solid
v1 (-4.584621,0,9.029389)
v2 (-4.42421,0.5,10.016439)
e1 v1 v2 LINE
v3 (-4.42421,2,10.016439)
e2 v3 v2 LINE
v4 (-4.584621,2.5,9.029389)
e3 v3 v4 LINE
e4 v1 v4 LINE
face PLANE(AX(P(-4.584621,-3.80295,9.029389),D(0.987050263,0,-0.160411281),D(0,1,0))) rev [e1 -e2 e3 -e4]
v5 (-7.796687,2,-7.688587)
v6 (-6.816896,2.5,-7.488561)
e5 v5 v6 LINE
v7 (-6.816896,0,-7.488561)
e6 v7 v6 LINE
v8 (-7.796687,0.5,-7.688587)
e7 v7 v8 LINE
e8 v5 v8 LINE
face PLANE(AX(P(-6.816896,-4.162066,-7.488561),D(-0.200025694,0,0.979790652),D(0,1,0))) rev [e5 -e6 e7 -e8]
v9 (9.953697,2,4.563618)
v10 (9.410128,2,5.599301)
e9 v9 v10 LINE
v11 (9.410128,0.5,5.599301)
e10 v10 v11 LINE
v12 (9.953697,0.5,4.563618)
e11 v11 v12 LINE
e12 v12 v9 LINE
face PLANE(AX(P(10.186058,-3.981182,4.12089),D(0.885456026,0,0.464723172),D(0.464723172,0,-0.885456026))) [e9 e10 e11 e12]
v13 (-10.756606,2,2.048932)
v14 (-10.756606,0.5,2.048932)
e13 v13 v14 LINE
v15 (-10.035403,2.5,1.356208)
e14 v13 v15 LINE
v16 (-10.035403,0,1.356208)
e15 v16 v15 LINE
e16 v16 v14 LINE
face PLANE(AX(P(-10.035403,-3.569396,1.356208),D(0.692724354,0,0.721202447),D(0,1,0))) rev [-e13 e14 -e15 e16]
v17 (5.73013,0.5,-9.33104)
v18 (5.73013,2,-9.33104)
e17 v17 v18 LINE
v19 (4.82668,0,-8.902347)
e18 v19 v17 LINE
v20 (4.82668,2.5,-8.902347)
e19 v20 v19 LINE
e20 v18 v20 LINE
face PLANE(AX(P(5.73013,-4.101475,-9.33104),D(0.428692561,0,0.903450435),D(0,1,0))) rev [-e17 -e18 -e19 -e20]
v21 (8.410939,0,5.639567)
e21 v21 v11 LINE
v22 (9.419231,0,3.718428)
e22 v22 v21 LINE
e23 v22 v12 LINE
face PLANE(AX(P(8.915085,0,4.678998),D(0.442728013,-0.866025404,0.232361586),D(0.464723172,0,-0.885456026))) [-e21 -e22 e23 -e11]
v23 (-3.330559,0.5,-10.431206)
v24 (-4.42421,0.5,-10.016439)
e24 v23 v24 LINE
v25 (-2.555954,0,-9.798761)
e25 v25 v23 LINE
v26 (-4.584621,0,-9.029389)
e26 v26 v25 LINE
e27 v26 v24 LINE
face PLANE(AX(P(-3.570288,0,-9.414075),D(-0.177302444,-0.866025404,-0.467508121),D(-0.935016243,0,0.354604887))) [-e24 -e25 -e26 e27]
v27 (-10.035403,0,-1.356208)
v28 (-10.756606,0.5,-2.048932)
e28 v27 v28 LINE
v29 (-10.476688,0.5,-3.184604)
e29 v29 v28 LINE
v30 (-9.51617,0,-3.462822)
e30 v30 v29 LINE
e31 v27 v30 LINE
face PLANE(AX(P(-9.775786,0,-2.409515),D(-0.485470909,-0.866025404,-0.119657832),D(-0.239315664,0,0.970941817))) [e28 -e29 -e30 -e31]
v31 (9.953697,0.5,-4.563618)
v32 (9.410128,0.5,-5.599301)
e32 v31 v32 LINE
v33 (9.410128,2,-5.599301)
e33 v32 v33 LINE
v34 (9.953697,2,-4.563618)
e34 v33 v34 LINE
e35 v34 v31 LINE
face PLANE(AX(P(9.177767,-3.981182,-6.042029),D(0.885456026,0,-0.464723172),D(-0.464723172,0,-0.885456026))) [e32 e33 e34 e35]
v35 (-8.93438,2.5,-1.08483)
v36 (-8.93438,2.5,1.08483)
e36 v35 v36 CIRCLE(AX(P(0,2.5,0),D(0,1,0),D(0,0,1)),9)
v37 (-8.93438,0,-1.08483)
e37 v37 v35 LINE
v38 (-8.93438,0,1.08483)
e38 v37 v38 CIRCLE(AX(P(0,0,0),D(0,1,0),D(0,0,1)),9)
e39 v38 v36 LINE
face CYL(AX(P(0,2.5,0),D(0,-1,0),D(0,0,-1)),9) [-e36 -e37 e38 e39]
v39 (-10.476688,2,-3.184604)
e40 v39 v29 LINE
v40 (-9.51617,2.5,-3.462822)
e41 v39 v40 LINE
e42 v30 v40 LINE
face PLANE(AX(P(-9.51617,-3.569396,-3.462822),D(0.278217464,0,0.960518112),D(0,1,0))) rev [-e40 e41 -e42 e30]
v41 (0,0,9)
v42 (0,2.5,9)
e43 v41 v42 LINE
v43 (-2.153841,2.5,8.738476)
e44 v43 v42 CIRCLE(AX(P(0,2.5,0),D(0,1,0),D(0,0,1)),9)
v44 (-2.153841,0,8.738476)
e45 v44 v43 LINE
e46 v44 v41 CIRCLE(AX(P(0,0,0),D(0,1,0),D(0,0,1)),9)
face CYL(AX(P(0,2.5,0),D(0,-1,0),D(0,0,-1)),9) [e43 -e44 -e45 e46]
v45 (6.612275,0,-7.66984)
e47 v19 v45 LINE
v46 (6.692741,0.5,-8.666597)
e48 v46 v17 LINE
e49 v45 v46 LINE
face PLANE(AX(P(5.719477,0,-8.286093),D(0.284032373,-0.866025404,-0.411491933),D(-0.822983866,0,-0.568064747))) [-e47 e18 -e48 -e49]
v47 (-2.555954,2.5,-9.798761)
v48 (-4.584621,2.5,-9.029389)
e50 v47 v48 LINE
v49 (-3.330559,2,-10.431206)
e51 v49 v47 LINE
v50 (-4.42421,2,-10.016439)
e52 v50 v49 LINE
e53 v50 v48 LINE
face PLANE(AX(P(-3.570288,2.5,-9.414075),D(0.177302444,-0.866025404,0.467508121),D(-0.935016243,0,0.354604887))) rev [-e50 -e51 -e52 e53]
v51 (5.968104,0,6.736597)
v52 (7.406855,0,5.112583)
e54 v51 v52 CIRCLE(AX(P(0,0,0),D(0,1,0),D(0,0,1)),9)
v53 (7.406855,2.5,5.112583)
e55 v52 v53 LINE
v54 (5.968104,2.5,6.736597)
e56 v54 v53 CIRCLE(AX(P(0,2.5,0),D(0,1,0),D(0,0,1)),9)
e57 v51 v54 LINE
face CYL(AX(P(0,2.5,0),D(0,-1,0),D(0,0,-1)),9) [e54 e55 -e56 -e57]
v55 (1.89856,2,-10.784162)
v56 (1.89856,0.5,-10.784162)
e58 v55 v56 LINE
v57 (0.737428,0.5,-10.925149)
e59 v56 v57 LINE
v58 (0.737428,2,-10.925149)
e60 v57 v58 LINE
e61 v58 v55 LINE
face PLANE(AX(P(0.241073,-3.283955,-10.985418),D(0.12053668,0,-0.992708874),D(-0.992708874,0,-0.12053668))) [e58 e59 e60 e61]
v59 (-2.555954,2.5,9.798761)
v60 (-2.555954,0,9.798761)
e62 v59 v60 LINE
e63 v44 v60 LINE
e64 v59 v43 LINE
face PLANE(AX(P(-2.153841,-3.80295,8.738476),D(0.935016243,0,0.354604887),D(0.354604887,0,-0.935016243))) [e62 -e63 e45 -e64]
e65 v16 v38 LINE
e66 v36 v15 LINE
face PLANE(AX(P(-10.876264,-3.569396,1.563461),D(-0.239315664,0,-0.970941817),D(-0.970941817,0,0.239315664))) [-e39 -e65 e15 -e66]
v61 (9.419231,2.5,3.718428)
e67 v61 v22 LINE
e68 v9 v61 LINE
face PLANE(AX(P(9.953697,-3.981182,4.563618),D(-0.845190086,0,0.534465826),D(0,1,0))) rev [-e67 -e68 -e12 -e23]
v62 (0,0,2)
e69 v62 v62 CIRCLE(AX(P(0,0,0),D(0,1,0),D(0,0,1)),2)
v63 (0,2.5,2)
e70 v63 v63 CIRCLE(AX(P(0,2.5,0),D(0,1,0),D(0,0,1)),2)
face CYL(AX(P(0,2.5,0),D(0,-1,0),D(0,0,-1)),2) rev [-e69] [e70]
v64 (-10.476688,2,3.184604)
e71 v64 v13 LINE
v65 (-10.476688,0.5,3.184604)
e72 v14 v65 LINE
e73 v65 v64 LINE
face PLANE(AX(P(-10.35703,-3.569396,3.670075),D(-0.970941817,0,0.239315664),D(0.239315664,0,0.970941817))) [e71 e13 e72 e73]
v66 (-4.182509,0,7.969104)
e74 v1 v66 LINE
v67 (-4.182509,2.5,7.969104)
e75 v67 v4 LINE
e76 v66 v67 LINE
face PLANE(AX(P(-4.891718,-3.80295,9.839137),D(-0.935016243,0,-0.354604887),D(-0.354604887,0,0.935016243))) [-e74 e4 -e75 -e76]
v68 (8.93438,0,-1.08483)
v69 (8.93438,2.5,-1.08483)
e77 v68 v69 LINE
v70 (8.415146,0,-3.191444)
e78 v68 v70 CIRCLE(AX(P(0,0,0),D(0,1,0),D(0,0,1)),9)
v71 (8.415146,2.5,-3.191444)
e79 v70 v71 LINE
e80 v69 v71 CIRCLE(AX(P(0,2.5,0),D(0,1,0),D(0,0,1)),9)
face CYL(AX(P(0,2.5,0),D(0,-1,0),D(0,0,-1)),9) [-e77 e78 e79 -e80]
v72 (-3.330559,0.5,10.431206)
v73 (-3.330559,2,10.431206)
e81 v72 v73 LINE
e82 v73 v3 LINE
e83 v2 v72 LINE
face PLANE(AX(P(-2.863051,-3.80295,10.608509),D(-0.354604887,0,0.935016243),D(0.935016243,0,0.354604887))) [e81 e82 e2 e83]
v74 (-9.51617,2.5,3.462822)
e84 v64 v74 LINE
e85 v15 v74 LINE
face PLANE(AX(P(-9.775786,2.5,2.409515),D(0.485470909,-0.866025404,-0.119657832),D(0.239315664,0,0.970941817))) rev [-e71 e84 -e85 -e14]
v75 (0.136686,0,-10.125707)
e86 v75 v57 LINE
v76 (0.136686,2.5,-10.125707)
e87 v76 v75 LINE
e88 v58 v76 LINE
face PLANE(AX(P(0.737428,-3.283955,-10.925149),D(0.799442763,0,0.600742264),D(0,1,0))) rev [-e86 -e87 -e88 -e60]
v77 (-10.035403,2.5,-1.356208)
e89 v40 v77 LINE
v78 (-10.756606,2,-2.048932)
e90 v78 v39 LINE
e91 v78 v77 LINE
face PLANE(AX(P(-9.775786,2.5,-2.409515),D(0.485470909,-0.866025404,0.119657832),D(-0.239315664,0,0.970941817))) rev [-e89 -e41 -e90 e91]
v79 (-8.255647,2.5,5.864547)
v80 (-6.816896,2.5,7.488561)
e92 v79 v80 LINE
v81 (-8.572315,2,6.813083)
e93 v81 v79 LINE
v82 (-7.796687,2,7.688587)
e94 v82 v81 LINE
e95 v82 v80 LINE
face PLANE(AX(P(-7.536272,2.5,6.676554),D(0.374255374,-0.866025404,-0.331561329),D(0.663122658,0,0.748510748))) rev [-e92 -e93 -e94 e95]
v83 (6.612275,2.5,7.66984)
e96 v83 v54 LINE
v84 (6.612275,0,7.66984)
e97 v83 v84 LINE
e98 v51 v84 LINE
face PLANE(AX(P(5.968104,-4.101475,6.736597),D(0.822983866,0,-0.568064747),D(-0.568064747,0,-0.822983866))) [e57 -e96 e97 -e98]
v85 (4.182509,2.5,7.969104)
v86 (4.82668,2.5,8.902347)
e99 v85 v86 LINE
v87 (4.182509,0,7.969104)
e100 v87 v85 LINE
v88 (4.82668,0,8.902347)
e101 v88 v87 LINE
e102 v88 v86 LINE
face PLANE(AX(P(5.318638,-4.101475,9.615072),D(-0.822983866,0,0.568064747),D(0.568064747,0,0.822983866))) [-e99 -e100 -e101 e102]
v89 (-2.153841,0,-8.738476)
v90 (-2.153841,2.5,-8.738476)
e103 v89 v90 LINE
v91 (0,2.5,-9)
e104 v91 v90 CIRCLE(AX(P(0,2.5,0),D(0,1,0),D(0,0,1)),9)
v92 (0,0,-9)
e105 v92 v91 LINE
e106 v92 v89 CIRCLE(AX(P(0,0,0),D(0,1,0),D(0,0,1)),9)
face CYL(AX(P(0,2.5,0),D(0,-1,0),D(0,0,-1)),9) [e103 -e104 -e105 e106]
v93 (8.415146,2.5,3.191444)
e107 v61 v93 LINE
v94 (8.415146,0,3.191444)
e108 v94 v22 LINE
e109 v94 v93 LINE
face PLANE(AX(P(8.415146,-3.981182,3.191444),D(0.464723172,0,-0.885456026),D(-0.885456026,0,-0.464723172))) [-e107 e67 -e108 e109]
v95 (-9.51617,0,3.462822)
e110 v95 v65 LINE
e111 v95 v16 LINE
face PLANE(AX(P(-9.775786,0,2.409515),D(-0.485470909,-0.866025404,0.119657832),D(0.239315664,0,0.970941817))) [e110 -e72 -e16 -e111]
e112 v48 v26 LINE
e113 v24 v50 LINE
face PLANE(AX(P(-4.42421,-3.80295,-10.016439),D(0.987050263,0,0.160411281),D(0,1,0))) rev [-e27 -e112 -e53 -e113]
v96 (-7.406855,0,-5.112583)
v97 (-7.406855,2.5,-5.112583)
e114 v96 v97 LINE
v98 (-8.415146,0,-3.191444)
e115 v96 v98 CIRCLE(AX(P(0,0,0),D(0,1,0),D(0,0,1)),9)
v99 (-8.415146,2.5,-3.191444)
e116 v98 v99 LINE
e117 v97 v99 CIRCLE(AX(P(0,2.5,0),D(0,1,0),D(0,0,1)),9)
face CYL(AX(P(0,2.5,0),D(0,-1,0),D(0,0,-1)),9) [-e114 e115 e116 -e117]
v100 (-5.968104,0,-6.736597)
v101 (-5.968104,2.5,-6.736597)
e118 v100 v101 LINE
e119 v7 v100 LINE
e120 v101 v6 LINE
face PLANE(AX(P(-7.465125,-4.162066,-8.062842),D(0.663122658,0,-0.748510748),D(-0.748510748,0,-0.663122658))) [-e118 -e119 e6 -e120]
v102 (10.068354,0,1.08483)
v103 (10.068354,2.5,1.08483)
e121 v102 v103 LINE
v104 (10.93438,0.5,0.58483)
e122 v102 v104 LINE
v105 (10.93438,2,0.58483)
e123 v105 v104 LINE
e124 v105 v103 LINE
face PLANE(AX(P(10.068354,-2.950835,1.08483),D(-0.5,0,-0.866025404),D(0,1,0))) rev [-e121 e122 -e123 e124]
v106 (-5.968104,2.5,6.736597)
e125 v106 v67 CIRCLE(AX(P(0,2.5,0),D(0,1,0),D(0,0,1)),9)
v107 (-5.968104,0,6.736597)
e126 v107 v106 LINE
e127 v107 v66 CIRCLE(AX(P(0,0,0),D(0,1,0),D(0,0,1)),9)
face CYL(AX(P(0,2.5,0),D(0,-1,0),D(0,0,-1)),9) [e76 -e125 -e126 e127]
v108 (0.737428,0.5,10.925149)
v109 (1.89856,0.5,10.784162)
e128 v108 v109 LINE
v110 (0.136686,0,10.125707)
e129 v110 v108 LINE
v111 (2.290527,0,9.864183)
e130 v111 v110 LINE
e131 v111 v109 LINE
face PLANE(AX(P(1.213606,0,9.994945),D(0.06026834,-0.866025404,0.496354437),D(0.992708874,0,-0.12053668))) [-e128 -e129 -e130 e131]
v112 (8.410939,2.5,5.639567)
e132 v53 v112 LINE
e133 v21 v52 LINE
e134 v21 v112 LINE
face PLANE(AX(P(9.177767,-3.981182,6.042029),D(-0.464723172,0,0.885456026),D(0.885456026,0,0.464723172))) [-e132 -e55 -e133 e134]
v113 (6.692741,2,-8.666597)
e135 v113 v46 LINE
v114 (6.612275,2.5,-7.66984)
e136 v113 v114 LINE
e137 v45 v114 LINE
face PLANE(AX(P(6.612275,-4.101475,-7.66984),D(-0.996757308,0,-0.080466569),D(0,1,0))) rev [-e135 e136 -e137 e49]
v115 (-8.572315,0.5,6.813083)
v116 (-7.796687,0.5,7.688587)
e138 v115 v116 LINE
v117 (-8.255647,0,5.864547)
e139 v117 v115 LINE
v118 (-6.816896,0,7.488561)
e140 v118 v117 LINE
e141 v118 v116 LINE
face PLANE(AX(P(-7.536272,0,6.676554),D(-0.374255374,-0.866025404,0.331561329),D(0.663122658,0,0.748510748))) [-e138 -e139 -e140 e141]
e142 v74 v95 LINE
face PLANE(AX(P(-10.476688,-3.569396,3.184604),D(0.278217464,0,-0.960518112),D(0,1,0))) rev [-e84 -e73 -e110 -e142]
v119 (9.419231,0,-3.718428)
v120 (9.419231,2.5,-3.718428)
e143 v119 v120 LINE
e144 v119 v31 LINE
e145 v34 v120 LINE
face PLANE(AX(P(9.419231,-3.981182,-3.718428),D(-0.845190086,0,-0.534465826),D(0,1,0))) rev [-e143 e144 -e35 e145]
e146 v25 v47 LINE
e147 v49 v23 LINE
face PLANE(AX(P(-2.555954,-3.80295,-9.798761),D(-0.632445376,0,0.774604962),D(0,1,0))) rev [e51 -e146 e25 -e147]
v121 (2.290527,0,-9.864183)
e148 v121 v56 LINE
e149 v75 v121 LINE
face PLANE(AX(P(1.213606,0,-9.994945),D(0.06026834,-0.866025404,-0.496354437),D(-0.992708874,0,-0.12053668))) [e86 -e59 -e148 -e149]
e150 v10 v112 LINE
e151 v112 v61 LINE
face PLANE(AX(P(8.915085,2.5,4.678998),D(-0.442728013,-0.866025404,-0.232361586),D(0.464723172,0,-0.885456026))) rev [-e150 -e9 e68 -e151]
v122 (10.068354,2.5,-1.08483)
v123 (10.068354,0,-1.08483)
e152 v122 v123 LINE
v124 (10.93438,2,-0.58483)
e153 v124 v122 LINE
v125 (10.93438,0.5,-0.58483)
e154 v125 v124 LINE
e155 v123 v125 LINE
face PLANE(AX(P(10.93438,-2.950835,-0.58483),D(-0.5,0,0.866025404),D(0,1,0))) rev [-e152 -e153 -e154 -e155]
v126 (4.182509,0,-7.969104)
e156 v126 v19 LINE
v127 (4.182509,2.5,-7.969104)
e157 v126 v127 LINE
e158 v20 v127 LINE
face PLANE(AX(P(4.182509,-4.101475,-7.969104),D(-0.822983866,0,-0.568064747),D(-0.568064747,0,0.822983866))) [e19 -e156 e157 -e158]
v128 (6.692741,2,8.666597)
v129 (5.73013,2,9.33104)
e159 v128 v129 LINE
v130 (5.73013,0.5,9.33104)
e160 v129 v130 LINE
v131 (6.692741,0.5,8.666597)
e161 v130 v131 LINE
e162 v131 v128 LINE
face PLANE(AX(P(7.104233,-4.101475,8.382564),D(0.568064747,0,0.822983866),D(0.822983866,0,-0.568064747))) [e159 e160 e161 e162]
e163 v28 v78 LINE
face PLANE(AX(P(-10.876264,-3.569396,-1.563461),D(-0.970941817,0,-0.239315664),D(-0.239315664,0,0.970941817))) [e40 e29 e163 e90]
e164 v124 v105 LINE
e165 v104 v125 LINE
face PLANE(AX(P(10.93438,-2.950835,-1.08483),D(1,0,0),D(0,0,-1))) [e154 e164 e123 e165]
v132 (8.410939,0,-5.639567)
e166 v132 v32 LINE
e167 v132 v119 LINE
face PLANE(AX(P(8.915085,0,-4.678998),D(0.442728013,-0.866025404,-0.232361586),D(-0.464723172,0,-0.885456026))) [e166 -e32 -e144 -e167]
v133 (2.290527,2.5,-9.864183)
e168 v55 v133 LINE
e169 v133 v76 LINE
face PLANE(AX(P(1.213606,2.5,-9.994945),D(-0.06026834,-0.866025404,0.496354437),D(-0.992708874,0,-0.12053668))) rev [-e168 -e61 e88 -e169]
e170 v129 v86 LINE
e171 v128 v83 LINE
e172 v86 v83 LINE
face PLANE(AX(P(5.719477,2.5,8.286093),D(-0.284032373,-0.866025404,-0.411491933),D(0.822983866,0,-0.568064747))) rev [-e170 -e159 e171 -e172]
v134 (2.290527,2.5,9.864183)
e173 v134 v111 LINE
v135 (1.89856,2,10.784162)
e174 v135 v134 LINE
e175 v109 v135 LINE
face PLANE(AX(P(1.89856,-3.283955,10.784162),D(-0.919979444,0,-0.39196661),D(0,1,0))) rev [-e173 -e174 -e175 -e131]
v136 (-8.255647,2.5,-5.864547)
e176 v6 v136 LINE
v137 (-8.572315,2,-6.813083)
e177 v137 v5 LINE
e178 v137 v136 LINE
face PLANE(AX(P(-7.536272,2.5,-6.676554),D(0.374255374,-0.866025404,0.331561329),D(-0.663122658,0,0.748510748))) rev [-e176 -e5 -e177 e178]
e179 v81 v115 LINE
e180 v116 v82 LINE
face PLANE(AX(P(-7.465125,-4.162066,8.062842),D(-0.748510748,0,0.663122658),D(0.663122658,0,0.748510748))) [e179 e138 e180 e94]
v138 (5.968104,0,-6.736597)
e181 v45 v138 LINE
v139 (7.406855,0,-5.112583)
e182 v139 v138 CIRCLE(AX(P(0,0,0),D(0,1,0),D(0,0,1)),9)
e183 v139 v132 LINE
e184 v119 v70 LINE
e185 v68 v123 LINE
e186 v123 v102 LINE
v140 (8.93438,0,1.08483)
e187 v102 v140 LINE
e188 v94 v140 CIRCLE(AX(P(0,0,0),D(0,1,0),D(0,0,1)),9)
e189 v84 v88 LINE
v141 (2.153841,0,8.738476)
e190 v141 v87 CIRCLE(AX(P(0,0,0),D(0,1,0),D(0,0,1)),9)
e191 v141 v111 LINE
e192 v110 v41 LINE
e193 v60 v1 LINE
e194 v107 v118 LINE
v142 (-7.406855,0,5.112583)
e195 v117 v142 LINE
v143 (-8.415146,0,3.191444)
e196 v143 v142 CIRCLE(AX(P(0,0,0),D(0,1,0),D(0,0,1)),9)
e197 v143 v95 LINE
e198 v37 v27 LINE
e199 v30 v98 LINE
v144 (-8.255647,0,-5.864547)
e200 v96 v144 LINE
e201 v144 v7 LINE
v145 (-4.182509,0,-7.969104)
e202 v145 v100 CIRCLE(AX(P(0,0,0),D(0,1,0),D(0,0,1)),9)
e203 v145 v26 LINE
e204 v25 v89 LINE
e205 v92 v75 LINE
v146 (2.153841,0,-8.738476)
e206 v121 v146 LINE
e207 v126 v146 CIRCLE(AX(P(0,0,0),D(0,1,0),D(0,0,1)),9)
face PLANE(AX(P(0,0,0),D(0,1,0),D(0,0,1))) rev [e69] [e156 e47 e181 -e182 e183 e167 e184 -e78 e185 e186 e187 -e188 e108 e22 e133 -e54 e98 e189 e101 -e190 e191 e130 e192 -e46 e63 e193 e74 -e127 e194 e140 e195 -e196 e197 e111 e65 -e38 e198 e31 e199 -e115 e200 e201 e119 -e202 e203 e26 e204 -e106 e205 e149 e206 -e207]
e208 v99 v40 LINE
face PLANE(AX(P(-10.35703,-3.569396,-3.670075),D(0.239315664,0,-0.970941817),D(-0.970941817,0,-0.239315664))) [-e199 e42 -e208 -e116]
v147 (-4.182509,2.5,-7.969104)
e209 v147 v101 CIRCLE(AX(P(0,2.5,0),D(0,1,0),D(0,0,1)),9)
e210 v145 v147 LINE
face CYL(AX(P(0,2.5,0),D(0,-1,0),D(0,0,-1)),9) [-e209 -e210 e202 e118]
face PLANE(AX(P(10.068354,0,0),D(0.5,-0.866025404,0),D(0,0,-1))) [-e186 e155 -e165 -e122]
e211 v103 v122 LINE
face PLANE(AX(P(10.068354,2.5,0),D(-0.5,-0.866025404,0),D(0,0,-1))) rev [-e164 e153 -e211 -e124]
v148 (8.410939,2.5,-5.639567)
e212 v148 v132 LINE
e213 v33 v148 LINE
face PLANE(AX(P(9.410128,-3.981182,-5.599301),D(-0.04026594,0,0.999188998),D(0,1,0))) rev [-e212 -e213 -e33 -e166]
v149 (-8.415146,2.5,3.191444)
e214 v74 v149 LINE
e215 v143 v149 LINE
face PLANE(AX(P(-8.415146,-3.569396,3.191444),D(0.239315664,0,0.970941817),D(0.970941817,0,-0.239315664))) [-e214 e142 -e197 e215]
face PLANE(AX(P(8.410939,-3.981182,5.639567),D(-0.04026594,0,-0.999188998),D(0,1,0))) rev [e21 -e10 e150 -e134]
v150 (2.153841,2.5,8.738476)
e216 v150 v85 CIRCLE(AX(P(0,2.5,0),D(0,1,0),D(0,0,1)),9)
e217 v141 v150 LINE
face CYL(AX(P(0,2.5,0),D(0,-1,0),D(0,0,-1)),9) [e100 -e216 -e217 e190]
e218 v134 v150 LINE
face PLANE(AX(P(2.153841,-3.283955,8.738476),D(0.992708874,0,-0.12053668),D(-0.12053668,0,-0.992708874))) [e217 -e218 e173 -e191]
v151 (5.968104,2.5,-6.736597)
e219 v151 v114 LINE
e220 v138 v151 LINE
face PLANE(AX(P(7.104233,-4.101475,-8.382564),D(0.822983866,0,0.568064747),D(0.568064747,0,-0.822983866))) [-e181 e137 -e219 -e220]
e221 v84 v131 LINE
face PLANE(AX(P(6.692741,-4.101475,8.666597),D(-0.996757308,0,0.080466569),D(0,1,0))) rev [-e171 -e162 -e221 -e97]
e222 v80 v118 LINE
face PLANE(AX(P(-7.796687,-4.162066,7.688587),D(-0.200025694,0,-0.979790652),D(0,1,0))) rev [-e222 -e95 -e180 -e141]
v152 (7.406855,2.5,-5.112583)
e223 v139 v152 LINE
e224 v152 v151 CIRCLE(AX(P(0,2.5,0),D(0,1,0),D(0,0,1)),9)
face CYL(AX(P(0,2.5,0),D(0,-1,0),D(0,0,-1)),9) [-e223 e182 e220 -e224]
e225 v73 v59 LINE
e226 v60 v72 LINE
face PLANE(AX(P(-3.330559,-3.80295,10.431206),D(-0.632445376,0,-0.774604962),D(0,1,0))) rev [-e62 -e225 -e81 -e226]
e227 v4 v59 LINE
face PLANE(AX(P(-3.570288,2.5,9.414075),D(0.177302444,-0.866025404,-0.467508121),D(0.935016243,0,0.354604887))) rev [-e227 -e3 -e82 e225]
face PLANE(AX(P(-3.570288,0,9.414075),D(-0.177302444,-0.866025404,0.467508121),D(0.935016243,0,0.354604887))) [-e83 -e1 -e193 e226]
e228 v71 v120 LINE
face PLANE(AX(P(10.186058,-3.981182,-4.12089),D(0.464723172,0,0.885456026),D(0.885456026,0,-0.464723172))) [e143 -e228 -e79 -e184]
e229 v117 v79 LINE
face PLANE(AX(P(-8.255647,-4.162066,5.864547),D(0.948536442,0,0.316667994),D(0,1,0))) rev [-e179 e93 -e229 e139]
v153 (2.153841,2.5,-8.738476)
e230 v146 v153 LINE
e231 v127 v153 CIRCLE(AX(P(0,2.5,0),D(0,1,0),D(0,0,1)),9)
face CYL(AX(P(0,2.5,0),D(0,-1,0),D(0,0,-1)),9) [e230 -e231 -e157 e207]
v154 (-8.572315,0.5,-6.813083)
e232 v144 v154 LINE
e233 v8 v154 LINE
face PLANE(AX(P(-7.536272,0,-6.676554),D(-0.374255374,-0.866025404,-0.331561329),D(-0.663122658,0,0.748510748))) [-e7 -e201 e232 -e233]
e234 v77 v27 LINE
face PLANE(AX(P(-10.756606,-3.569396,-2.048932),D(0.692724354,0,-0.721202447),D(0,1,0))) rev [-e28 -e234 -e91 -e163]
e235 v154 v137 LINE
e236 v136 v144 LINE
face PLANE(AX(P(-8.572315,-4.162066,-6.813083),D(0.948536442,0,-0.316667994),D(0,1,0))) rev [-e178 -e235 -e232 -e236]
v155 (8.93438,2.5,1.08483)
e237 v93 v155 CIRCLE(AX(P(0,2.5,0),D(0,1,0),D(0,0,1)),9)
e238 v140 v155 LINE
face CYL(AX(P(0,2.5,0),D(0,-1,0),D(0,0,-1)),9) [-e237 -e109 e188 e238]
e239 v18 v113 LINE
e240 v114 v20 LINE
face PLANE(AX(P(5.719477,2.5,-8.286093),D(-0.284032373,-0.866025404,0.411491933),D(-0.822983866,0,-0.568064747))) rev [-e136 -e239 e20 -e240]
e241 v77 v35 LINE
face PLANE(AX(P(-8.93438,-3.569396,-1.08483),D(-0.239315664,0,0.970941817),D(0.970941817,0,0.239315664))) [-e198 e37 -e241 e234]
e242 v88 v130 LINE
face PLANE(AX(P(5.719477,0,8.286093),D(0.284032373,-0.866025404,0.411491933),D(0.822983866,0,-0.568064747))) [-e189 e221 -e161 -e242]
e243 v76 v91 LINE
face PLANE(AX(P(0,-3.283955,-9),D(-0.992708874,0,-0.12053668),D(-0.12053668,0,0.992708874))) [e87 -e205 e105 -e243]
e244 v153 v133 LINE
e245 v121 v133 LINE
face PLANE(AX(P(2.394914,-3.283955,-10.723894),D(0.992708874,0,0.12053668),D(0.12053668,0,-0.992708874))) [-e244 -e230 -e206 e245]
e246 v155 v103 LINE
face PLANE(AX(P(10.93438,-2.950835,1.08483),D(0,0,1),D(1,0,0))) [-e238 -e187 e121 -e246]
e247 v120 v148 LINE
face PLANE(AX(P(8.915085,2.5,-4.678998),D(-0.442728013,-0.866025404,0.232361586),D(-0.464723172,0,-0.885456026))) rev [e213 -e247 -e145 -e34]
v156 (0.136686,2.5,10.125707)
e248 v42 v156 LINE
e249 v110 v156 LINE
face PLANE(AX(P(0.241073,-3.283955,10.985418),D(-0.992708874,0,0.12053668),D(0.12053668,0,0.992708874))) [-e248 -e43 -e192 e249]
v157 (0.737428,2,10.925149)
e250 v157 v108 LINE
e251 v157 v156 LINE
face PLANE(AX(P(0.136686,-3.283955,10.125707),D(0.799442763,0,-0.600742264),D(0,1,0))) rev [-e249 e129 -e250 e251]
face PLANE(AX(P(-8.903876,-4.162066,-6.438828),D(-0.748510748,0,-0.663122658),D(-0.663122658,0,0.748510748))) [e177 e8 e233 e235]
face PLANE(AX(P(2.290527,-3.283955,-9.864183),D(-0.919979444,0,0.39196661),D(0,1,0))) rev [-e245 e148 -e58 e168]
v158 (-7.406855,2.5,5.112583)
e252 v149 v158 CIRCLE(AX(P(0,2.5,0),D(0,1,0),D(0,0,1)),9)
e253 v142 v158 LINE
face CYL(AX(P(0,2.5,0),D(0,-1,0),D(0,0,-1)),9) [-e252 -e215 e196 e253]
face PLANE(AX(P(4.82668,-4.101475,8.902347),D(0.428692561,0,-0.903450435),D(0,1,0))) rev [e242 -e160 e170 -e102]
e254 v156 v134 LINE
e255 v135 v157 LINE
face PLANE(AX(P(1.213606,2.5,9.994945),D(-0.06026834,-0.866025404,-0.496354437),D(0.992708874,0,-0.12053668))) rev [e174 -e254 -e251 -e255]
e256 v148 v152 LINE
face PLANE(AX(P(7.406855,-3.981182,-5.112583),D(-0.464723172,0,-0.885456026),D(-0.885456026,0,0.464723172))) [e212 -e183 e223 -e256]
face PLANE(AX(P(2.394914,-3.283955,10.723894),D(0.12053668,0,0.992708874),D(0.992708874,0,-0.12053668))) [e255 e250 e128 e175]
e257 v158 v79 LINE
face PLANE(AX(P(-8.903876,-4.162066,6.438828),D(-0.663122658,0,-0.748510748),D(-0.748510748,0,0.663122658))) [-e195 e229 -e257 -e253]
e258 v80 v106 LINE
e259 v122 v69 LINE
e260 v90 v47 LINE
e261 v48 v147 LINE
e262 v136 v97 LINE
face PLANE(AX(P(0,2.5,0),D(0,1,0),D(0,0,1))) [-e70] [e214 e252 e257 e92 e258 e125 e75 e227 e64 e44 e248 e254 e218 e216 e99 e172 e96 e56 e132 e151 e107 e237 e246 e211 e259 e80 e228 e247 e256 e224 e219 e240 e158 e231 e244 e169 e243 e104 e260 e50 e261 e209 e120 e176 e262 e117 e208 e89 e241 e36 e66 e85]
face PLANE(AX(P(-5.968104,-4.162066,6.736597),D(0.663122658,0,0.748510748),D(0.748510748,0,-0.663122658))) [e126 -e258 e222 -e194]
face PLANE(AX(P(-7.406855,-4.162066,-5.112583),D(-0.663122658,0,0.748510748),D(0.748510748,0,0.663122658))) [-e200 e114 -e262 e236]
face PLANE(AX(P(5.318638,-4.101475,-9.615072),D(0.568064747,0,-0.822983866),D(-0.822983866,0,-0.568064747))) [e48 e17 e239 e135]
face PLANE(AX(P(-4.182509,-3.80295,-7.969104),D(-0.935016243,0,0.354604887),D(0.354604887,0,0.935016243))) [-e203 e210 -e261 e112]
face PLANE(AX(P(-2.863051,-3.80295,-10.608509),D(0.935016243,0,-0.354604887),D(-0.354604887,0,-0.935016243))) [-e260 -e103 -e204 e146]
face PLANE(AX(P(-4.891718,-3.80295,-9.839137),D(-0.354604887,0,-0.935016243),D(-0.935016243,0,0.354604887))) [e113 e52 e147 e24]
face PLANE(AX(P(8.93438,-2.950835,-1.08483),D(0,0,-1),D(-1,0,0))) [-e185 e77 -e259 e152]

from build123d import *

# Parameters (mm, degrees)
SKETCH1_R                = 9
SKETCH1_R_2              = 2
BOSS_EXTRUDE1_DEPTH      = 2.5
BOSS_EXTRUDE2_START      = -2.5
BOSS_EXTRUDE2_DEPTH      = 2.5
CHAMFER1_SIZE            = 0.5
CHAMFER1_SIZE2           = 0.866025404
CIRPATTERN1_DEPTH        = 2.5
CIRPATTERN1_START        = -6
CIRPATTERN1_2_OUTLINE_W  = 5
CIRPATTERN1_2_OUTLINE_H  = 6
CIRPATTERN1_2_DEPTH      = 0.965822768
CIRPATTERN1_START_2      = -7.632253443
CIRPATTERN1_3_OUTLINE_W  = 5
CIRPATTERN1_3_OUTLINE_H  = 6
CIRPATTERN1_3_DEPTH      = 0.433012702
CIRPATTERN1_4_OUTLINE_W  = 5
CIRPATTERN1_4_OUTLINE_H  = 5
CIRPATTERN1_4_DEPTH      = 0.965822768
CIRPATTERN1_START_3      = -9
CIRPATTERN1_5_OUTLINE_W  = 5
CIRPATTERN1_5_OUTLINE_H  = 6
CIRPATTERN1_5_DEPTH      = 1.800759259
CIRPATTERN1_START_4      = -5.467189934
CIRPATTERN1_6_OUTLINE_W  = 5
CIRPATTERN1_6_OUTLINE_H  = 5
CIRPATTERN1_6_DEPTH      = 0.433012702
CIRPATTERN1_7_OUTLINE_W  = 6
CIRPATTERN1_7_OUTLINE_H  = 5
CIRPATTERN1_7_DEPTH      = 1.800759259
CIRPATTERN1_8_OUTLINE_W  = 5
CIRPATTERN1_8_OUTLINE_H  = 5
CIRPATTERN1_8_DEPTH      = 0.965822768
CIRPATTERN1_9_OUTLINE_W  = 6
CIRPATTERN1_9_OUTLINE_H  = 5
CIRPATTERN1_9_DEPTH      = 1.800759259
CIRPATTERN1_10_OUTLINE_W = 5
CIRPATTERN1_10_OUTLINE_H = 5
CIRPATTERN1_10_DEPTH     = 0.965822768
CIRPATTERN1_11_OUTLINE_W = 5
CIRPATTERN1_11_OUTLINE_H = 6
CIRPATTERN1_11_DEPTH     = 1.800759259
CIRPATTERN1_12_OUTLINE_W = 5
CIRPATTERN1_12_OUTLINE_H = 6
CIRPATTERN1_12_DEPTH     = 0.965822768
CIRPATTERN1_13_OUTLINE_W = 5
CIRPATTERN1_13_OUTLINE_H = 6
CIRPATTERN1_13_DEPTH     = 1.800759259
CIRPATTERN1_START_5      = 5.034177232
CIRPATTERN1_14_OUTLINE_W = 5
CIRPATTERN1_14_OUTLINE_H = 5
CIRPATTERN1_14_DEPTH     = 0.965822768
CIRPATTERN1_START_6      = 7.199240741
CIRPATTERN1_15_OUTLINE_W = 5
CIRPATTERN1_15_OUTLINE_H = 5
CIRPATTERN1_15_DEPTH     = 0.433012702
CIRPATTERN1_16_OUTLINE_W = 5
CIRPATTERN1_16_OUTLINE_H = 6
CIRPATTERN1_16_DEPTH     = 0.965822768
CIRPATTERN1_17_OUTLINE_W = 6
CIRPATTERN1_17_OUTLINE_H = 6
CIRPATTERN1_17_DEPTH     = 1.800759259
CIRPATTERN1_18_OUTLINE_W = 6
CIRPATTERN1_18_OUTLINE_H = 6
CIRPATTERN1_18_DEPTH     = 0.965822768
CIRPATTERN1_19_OUTLINE_W = 6
CIRPATTERN1_19_OUTLINE_H = 6
CIRPATTERN1_19_DEPTH     = 1.800759259
CIRPATTERN1_20_OUTLINE_W = 5
CIRPATTERN1_20_OUTLINE_H = 6
CIRPATTERN1_20_DEPTH     = 0.965822768
CIRPATTERN1_21_OUTLINE_W = 5
CIRPATTERN1_21_OUTLINE_H = 6
CIRPATTERN1_21_DEPTH     = 0.433012702
CIRPATTERN1_22_OUTLINE_W = 6
CIRPATTERN1_22_OUTLINE_H = 6
CIRPATTERN1_22_DEPTH     = 0.965822768
CIRPATTERN1_23_OUTLINE_W = 6
CIRPATTERN1_23_OUTLINE_H = 6
CIRPATTERN1_23_DEPTH     = 1.800759259
CIRPATTERN1_24_OUTLINE_W = 5
CIRPATTERN1_24_OUTLINE_H = 6
CIRPATTERN1_24_DEPTH     = 0.965822768
CIRPATTERN1_25_OUTLINE_W = 6
CIRPATTERN1_25_OUTLINE_H = 6
CIRPATTERN1_25_DEPTH     = 1.800759259


with BuildPart() as part:
    # Sketch1 → Boss-Extrude1 (new body)
    with BuildSketch(Plane(origin=(0, 0, 0), x_dir=(1, 0, 0), z_dir=(0, 1, 0))):
        with Locations(Location((0, 0, 0), (0, 0, 270))):
            Circle(SKETCH1_R)
        with Locations(Location((0, 0, 0), (0, 0, 270))):
            Circle(SKETCH1_R_2, mode=Mode.SUBTRACT)
    extrude(amount=BOSS_EXTRUDE1_DEPTH)

    # Sketch2 → Boss-Extrude2 (add)
    with BuildSketch(Plane(origin=(0, 2.5, 0), x_dir=(1, 0, 0), z_dir=(0, 1, 0)).offset(BOSS_EXTRUDE2_START)):
        with BuildLine():
            Line((0, 9), (0.241073361, 10.985417748))
            Line((0.241073361, 10.985417748), (2.394914339, 10.723894105))
            Line((2.394914339, 10.723894105), (2.153840979, 8.738476357))
            ThreePointArc((2.153840979, 8.738476357), (1.084830122, 8.934379867), (0, 9))
        make_face()
    extrude(amount=BOSS_EXTRUDE2_DEPTH)

    # Chamfer1
    chamfer1_edges = [part.edges().sort_by_distance(p)[0] for p in [
        (0.241073361, 1.25, -10.985417748),
        (2.394914339, 1.25, -10.723894105),
        (1.31799385, 2.5, -10.854655927),
        (1.31799385, 0, -10.854655927),
    ]]
    chamfer1_side = [part.faces().sort_by_distance(p)[0] for p in [
        (1.31799385, 1.25, -10.854655927),
    ]]
    chamfer(chamfer1_edges, length=CHAMFER1_SIZE, length2=CHAMFER1_SIZE2, reference=chamfer1_side[0])

    # CirPattern1: read off the stored shape, not the designer's step
    # CirPattern1 outline → CirPattern1 (add)
    with BuildSketch(Plane(origin=(0, 0, 0), x_dir=(1, 0, 0), z_dir=(0, 1, 0))):
        with BuildLine():
            Line((-4.424210201, 10.01643916), (-4.584621482, 9.029388897))
            Line((-4.584621482, 9.029388897), (-4.182508548, 7.969104231))
            ThreePointArc((-4.182508548, 7.969104231), (-3.191443983, 8.415146184), (-2.153840979, 8.738476357))
            Line((-2.153840979, 8.738476357), (-2.555953912, 9.798761023))
            Line((-2.555953912, 9.798761023), (-3.330558874, 10.431206399))
            Line((-3.330558874, 10.431206399), (-4.424210201, 10.01643916))
        make_face()
        with BuildLine():
            ThreePointArc((4.182508548, 7.969104232), (5.112582721, 7.406854794), (5.968103924, 6.736596734))
            Line((5.968103924, 6.736596734), (6.612274916, 7.669839531))
            Line((6.612274916, 7.669839531), (6.692741485, 8.666596839))
            Line((6.692741485, 8.666596839), (5.730129975, 9.331039589))
            Line((5.730129975, 9.331039589), (4.82667954, 8.902347028))
            Line((4.82667954, 8.902347028), (4.182508548, 7.969104232))
        make_face()
        with BuildLine():
            ThreePointArc((7.406854794, 5.112582721), (7.969104232, 4.182508549), (8.415146185, 3.191443983))
            Line((8.415146185, 3.191443983), (9.419230823, 3.718428255))
            Line((9.419230823, 3.718428255), (9.953696649, 4.56361834))
            Line((9.953696649, 4.56361834), (9.41012843, 5.599301052))
            Line((9.41012843, 5.599301052), (8.410939432, 5.639566992))
            Line((8.410939432, 5.639566992), (7.406854794, 5.112582721))
        make_face()
        with BuildLine():
            ThreePointArc((8.934379868, 1.084830122), (9.000000001, 0), (8.934379868, -1.084830122))
            Line((8.934379868, -1.084830122), (10.068354463, -1.084830122))
            Line((10.068354463, -1.084830122), (10.934379867, -0.584830122))
            Line((10.934379867, -0.584830122), (10.934379867, 0.584830122))
            Line((10.934379867, 0.584830122), (10.068354463, 1.084830122))
            Line((10.068354463, 1.084830122), (8.934379868, 1.084830122))
        make_face()
        with BuildLine():
            ThreePointArc((8.415146185, -3.191443984), (7.969104232, -4.182508549), (7.406854794, -5.112582721))
            Line((7.406854794, -5.112582721), (8.410939432, -5.639566992))
            Line((8.410939432, -5.639566992), (9.41012843, -5.599301052))
            Line((9.41012843, -5.599301052), (9.953696649, -4.56361834))
            Line((9.953696649, -4.56361834), (9.419230823, -3.718428255))
            Line((9.419230823, -3.718428255), (8.415146185, -3.191443984))
        make_face()
        with BuildLine():
            ThreePointArc((5.968103924, -6.736596734), (5.112582721, -7.406854794), (4.182508548, -7.969104232))
            Line((4.182508548, -7.969104232), (4.82667954, -8.902347028))
            Line((4.82667954, -8.902347028), (5.730129975, -9.331039589))
            Line((5.730129975, -9.331039589), (6.692741485, -8.666596839))
            Line((6.692741485, -8.666596839), (6.612274916, -7.669839531))
            Line((6.612274916, -7.669839531), (5.968103924, -6.736596734))
        make_face()
        with BuildLine():
            ThreePointArc((2.153840979, -8.738476357), (1.084830123, -8.934379867), (0, -9))
            Line((0, -9), (0.136685533, -10.125706645))
            Line((0.136685533, -10.125706645), (0.737427798, -10.925149408))
            Line((0.737427798, -10.925149408), (1.898559902, -10.784162445))
            Line((1.898559902, -10.784162445), (2.290526512, -9.864183001))
            Line((2.290526512, -9.864183001), (2.153840979, -8.738476357))
        make_face()
        with BuildLine():
            ThreePointArc((-2.153840979, -8.738476357), (-3.191443983, -8.415146184), (-4.182508548, -7.969104231))
            Line((-4.182508548, -7.969104231), (-4.584621482, -9.029388897))
            Line((-4.584621482, -9.029388897), (-4.424210201, -10.01643916))
            Line((-4.424210201, -10.01643916), (-3.330558874, -10.431206399))
            Line((-3.330558874, -10.431206399), (-2.555953912, -9.798761023))
            Line((-2.555953912, -9.798761023), (-2.153840979, -8.738476357))
        make_face()
        with BuildLine():
            ThreePointArc((-5.968103923, -6.736596733), (-6.736596733, -5.968103924), (-7.406854792, -5.11258272))
            Line((-7.406854792, -5.11258272), (-8.255646966, -5.864546969))
            Line((-8.255646966, -5.864546969), (-8.57231496, -6.813083411))
            Line((-8.57231496, -6.813083411), (-7.79668675, -7.688586676))
            Line((-7.79668675, -7.688586676), (-6.816896098, -7.488560982))
            Line((-6.816896098, -7.488560982), (-5.968103923, -6.736596733))
        make_face()
        with BuildLine():
            ThreePointArc((-8.415146183, -3.191443983), (-8.738476356, -2.153840978), (-8.934379866, -1.084830122))
            Line((-8.934379866, -1.084830122), (-10.035403222, -1.356208006))
            Line((-10.035403222, -1.356208006), (-10.75660567, -2.04893236))
            Line((-10.75660567, -2.04893236), (-10.476687651, -3.184604403))
            Line((-10.476687651, -3.184604403), (-9.51616954, -3.462821867))
            Line((-9.51616954, -3.462821867), (-8.415146183, -3.191443983))
        make_face()
        with BuildLine():
            ThreePointArc((-8.934379866, 1.084830122), (-8.738476356, 2.153840978), (-8.415146183, 3.191443983))
            Line((-8.415146183, 3.191443983), (-9.51616954, 3.462821867))
            Line((-9.51616954, 3.462821867), (-10.476687651, 3.184604403))
            Line((-10.476687651, 3.184604403), (-10.75660567, 2.04893236))
            Line((-10.75660567, 2.04893236), (-10.035403222, 1.356208006))
            Line((-10.035403222, 1.356208006), (-8.934379866, 1.084830122))
        make_face()
        with BuildLine():
            ThreePointArc((-7.406854792, 5.11258272), (-6.736596733, 5.968103924), (-5.968103923, 6.736596733))
            Line((-5.968103923, 6.736596733), (-6.816896098, 7.488560982))
            Line((-6.816896098, 7.488560982), (-7.79668675, 7.688586676))
            Line((-7.79668675, 7.688586676), (-8.57231496, 6.813083411))
            Line((-8.57231496, 6.813083411), (-8.255646966, 5.864546969))
            Line((-8.255646966, 5.864546969), (-7.406854792, 5.11258272))
        make_face()
    extrude(amount=CIRPATTERN1_DEPTH)

    # CirPattern1 2 outline → CirPattern1 2 (cut)
    with BuildSketch(Plane(origin=(0, 0, 0), x_dir=(0.984156412122274, -0.15602034224555472, -0.08422475458078069), z_dir=(0.17730244352126895, 0.8660254037844377, 0.4675081213427088)).offset(CIRPATTERN1_START)):
        with Locations((-2.5, 9)):
            Rectangle(CIRPATTERN1_2_OUTLINE_W, CIRPATTERN1_2_OUTLINE_H)
    extrude(amount=CIRPATTERN1_2_DEPTH, mode=Mode.SUBTRACT)

    # CirPattern1 3 outline → CirPattern1 3 (cut)
    with BuildSketch(Plane(origin=(0, 0, 0), x_dir=(0.984156412122274, 0.15602034224555472, -0.08422475458078069), z_dir=(0.17730244352126895, -0.8660254037844377, 0.4675081213427088)).offset(CIRPATTERN1_START_2)):
        with Locations((-2.5, -8)):
            Rectangle(CIRPATTERN1_3_OUTLINE_W, CIRPATTERN1_3_OUTLINE_H)
    extrude(amount=CIRPATTERN1_3_DEPTH, mode=Mode.SUBTRACT)

    # CirPattern1 4 outline → CirPattern1 4 (cut)
    with BuildSketch(Plane(origin=(0, 0, 0), x_dir=(0.9273256790190187, -0.3495154602035865, -0.13381340781323425), z_dir=(0.37425537408555104, 0.8660254037844392, 0.33156132912039604)).offset(CIRPATTERN1_START)):
        with Locations((-6.5, 6.5)):
            Rectangle(CIRPATTERN1_4_OUTLINE_W, CIRPATTERN1_4_OUTLINE_H)
    extrude(amount=CIRPATTERN1_4_DEPTH, mode=Mode.SUBTRACT)

    # CirPattern1 5 outline → CirPattern1 5 (cut)
    with BuildSketch(Plane(origin=(0, 0, 0), x_dir=(0.9273256790190192, 0.3495154602035857, -0.13381340781323395), z_dir=(0.3742553740855502, -0.8660254037844394, 0.33156132912039615)).offset(CIRPATTERN1_START_3)):
        with Locations((-5.5, -6)):
            Rectangle(CIRPATTERN1_5_OUTLINE_W, CIRPATTERN1_5_OUTLINE_H)
    extrude(amount=CIRPATTERN1_5_DEPTH, mode=Mode.SUBTRACT)

    # CirPattern1 6 outline → CirPattern1 6 (cut)
    with BuildSketch(Plane(origin=(0, 0, 0), x_dir=(0.8742528220105147, -0.48090223921375025, -0.06644576379162259), z_dir=(0.48547090871302595, 0.866025403784439, 0.11965783214377698)).offset(CIRPATTERN1_START_4)):
        with Locations((-9.5, 2.5)):
            Rectangle(CIRPATTERN1_6_OUTLINE_W, CIRPATTERN1_6_OUTLINE_H)
    extrude(amount=CIRPATTERN1_6_DEPTH, mode=Mode.SUBTRACT)

    # CirPattern1 7 outline → CirPattern1 7 (cut)
    with BuildSketch(Plane(origin=(0, 0, 0), x_dir=(0.8742528220105142, 0.4809022392137511, -0.06644576379162273), z_dir=(0.48547090871302684, -0.8660254037844385, 0.11965783214377695)).offset(CIRPATTERN1_START_3)):
        with Locations((-8, -2.5)):
            Rectangle(CIRPATTERN1_7_OUTLINE_W, CIRPATTERN1_7_OUTLINE_H)
    extrude(amount=CIRPATTERN1_7_DEPTH, mode=Mode.SUBTRACT)

    # CirPattern1 8 outline → CirPattern1 8 (cut)
    with BuildSketch(Plane(origin=(0, 0, 0), x_dir=(0.8742528220105146, -0.48090223921375014, 0.06644576379162488), z_dir=(0.4854709087130262, 0.8660254037844384, -0.11965783214378103)).offset(CIRPATTERN1_START)):
        with Locations((-9.5, -2.5)):
            Rectangle(CIRPATTERN1_8_OUTLINE_W, CIRPATTERN1_8_OUTLINE_H)
    extrude(amount=CIRPATTERN1_8_DEPTH, mode=Mode.SUBTRACT)

    # CirPattern1 9 outline → CirPattern1 9 (cut)
    with BuildSketch(Plane(origin=(0, 0, 0), x_dir=(0.8742528220105146, 0.48090223921375014, 0.06644576379162488), z_dir=(0.4854709087130262, -0.8660254037844384, -0.11965783214378103)).offset(CIRPATTERN1_START_3)):
        with Locations((-8, 2.5)):
            Rectangle(CIRPATTERN1_9_OUTLINE_W, CIRPATTERN1_9_OUTLINE_H)
    extrude(amount=CIRPATTERN1_9_DEPTH, mode=Mode.SUBTRACT)

    # CirPattern1 10 outline → CirPattern1 10 (cut)
    with BuildSketch(Plane(origin=(0, 0, 0), x_dir=(0.9273256790190201, -0.34951546020358326, 0.13381340781323425), z_dir=(0.37425537408554804, 0.8660254037844393, -0.3315613291203991)).offset(CIRPATTERN1_START)):
        with Locations((-6.5, -6.5)):
            Rectangle(CIRPATTERN1_10_OUTLINE_W, CIRPATTERN1_10_OUTLINE_H)
    extrude(amount=CIRPATTERN1_10_DEPTH, mode=Mode.SUBTRACT)

    # CirPattern1 11 outline → CirPattern1 11 (cut)
    with BuildSketch(Plane(origin=(0, 0, 0), x_dir=(0.9273256790190201, 0.34951546020358326, 0.13381340781323425), z_dir=(0.37425537408554804, -0.8660254037844393, -0.3315613291203991)).offset(CIRPATTERN1_START_3)):
        with Locations((-5.5, 6)):
            Rectangle(CIRPATTERN1_11_OUTLINE_W, CIRPATTERN1_11_OUTLINE_H)
    extrude(amount=CIRPATTERN1_11_DEPTH, mode=Mode.SUBTRACT)

    # CirPattern1 12 outline → CirPattern1 12 (cut)
    with BuildSketch(Plane(origin=(0, 0, 0), x_dir=(0.9841564121222747, -0.15602034224555122, 0.08422475458077869), z_dir=(0.17730244352126492, 0.8660254037844386, -0.4675081213427087)).offset(CIRPATTERN1_START)):
        with Locations((-2.5, -9)):
            Rectangle(CIRPATTERN1_12_OUTLINE_W, CIRPATTERN1_12_OUTLINE_H)
    extrude(amount=CIRPATTERN1_12_DEPTH, mode=Mode.SUBTRACT)

    # CirPattern1 13 outline → CirPattern1 13 (cut)
    with BuildSketch(Plane(origin=(0, 0, 0), x_dir=(0.9841564121222747, 0.15602034224555134, 0.08422475458077885), z_dir=(0.1773024435212651, -0.8660254037844384, -0.4675081213427092)).offset(CIRPATTERN1_START_3)):
        with Locations((-2.5, 8)):
            Rectangle(CIRPATTERN1_13_OUTLINE_W, CIRPATTERN1_13_OUTLINE_H)
    extrude(amount=CIRPATTERN1_13_DEPTH, mode=Mode.SUBTRACT)

    # CirPattern1 14 outline → CirPattern1 14 (cut)
    with BuildSketch(Plane(origin=(0, 0, 0), x_dir=(0.9981822114114517, 0.05228896387632066, -0.029968935224408574), z_dir=(0.0602683401276654, -0.8660254037844379, 0.49635443704902793)).offset(CIRPATTERN1_START_5)):
        with Locations((0.5, 9.5)):
            Rectangle(CIRPATTERN1_14_OUTLINE_W, CIRPATTERN1_14_OUTLINE_H)
    extrude(amount=CIRPATTERN1_14_DEPTH, mode=Mode.SUBTRACT)

    # CirPattern1 15 outline → CirPattern1 15 (cut)
    with BuildSketch(Plane(origin=(0, 0, 0), x_dir=(0.9981822114114517, -0.05228896387632066, -0.029968935224408574), z_dir=(0.0602683401276654, 0.8660254037844379, 0.49635443704902793)).offset(CIRPATTERN1_START_6)):
        with Locations((0.5, -8.5)):
            Rectangle(CIRPATTERN1_15_OUTLINE_W, CIRPATTERN1_15_OUTLINE_H)
    extrude(amount=CIRPATTERN1_15_DEPTH, mode=Mode.SUBTRACT)

    # CirPattern1 16 outline → CirPattern1 16 (cut)
    with BuildSketch(Plane(origin=(0, 0, 0), x_dir=(0.9588146905843248, 0.2565451418791621, -0.1218974130073563), z_dir=(0.28403237336558207, -0.8660254037844384, 0.4114919329468262)).offset(CIRPATTERN1_START_5)):
        with Locations((4.5, 8)):
            Rectangle(CIRPATTERN1_16_OUTLINE_W, CIRPATTERN1_16_OUTLINE_H)
    extrude(amount=CIRPATTERN1_16_DEPTH, mode=Mode.SUBTRACT)

    # CirPattern1 17 outline → CirPattern1 17 (cut)
    with BuildSketch(Plane(origin=(0, 0, 0), x_dir=(0.9588146905843248, -0.256545141879162, -0.12189741300735611), z_dir=(0.2840323733655819, 0.8660254037844386, 0.41149193294682584)).offset(CIRPATTERN1_START_6)):
        with Locations((4, -7)):
            Rectangle(CIRPATTERN1_17_OUTLINE_W, CIRPATTERN1_17_OUTLINE_H)
    extrude(amount=CIRPATTERN1_17_DEPTH, mode=Mode.SUBTRACT)

    # CirPattern1 18 outline → CirPattern1 18 (cut)
    with BuildSketch(Plane(origin=(0, 0, 0), x_dir=(0.8966559578002048, 0.4276040355717775, -0.1147296043056335), z_dir=(0.442728012826608, -0.866025403784438, 0.23236158602188103)).offset(CIRPATTERN1_START_5)):
        with Locations((8, 5)):
            Rectangle(CIRPATTERN1_18_OUTLINE_W, CIRPATTERN1_18_OUTLINE_H)
    extrude(amount=CIRPATTERN1_18_DEPTH, mode=Mode.SUBTRACT)

    # CirPattern1 19 outline → CirPattern1 19 (cut)
    with BuildSketch(Plane(origin=(0, 0, 0), x_dir=(0.8966559578002048, -0.42760403557177773, -0.11472960430563307), z_dir=(0.4427280128266081, 0.8660254037844383, 0.2323615860218801)).offset(CIRPATTERN1_START_6)):
        with Locations((7, -4)):
            Rectangle(CIRPATTERN1_19_OUTLINE_W, CIRPATTERN1_19_OUTLINE_H)
    extrude(amount=CIRPATTERN1_19_DEPTH, mode=Mode.SUBTRACT)

    # CirPattern1 20 outline → CirPattern1 20 (cut)
    with BuildSketch(Plane(origin=(0, 0, 0), x_dir=(0.8660254037844386, 0.4999999999999999, 0), z_dir=(0.4999999999999999, -0.8660254037844388, 0)).offset(CIRPATTERN1_START_5)):
        with Locations((9.5, 0)):
            Rectangle(CIRPATTERN1_20_OUTLINE_W, CIRPATTERN1_20_OUTLINE_H)
    extrude(amount=CIRPATTERN1_20_DEPTH, mode=Mode.SUBTRACT)

    # CirPattern1 21 outline → CirPattern1 21 (cut)
    with BuildSketch(Plane(origin=(0, 0, 0), x_dir=(0.8660254037844386, -0.4999999999999999, 0), z_dir=(0.4999999999999999, 0.8660254037844388, 0)).offset(CIRPATTERN1_START_6)):
        with Locations((8.5, 0)):
            Rectangle(CIRPATTERN1_21_OUTLINE_W, CIRPATTERN1_21_OUTLINE_H)
    extrude(amount=CIRPATTERN1_21_DEPTH, mode=Mode.SUBTRACT)

    # CirPattern1 22 outline → CirPattern1 22 (cut)
    with BuildSketch(Plane(origin=(0, 0, 0), x_dir=(0.8966559578002079, 0.4276040355717707, 0.11472960430563549), z_dir=(0.44272801282660196, -0.8660254037844389, -0.232361586021889)).offset(CIRPATTERN1_START_5)):
        with Locations((8, -5)):
            Rectangle(CIRPATTERN1_22_OUTLINE_W, CIRPATTERN1_22_OUTLINE_H)
    extrude(amount=CIRPATTERN1_22_DEPTH, mode=Mode.SUBTRACT)

    # CirPattern1 23 outline → CirPattern1 23 (cut)
    with BuildSketch(Plane(origin=(0, 0, 0), x_dir=(0.8966559578002083, -0.42760403557177, 0.1147296043056353), z_dir=(0.4427280128266012, 0.8660254037844394, -0.23236158602188908)).offset(CIRPATTERN1_START_6)):
        with Locations((7, 4)):
            Rectangle(CIRPATTERN1_23_OUTLINE_W, CIRPATTERN1_23_OUTLINE_H)
    extrude(amount=CIRPATTERN1_23_DEPTH, mode=Mode.SUBTRACT)

    # CirPattern1 24 outline → CirPattern1 24 (cut)
    with BuildSketch(Plane(origin=(0, 0, 0), x_dir=(0.9588146905843272, 0.25654514187915395, 0.12189741300735493), z_dir=(0.2840323733655741, -0.8660254037844373, -0.4114919329468341)).offset(CIRPATTERN1_START_5)):
        with Locations((4.5, -8)):
            Rectangle(CIRPATTERN1_24_OUTLINE_W, CIRPATTERN1_24_OUTLINE_H)
    extrude(amount=CIRPATTERN1_24_DEPTH, mode=Mode.SUBTRACT)

    # CirPattern1 25 outline → CirPattern1 25 (cut)
    with BuildSketch(Plane(origin=(0, 0, 0), x_dir=(0.9588146905843271, -0.2565451418791541, 0.12189741300735471), z_dir=(0.2840323733655742, 0.8660254037844375, -0.4114919329468332)).offset(CIRPATTERN1_START_6)):
        with Locations((4, 7)):
            Rectangle(CIRPATTERN1_25_OUTLINE_W, CIRPATTERN1_25_OUTLINE_H)
    extrude(amount=CIRPATTERN1_25_DEPTH, mode=Mode.SUBTRACT)


solid = part.part
